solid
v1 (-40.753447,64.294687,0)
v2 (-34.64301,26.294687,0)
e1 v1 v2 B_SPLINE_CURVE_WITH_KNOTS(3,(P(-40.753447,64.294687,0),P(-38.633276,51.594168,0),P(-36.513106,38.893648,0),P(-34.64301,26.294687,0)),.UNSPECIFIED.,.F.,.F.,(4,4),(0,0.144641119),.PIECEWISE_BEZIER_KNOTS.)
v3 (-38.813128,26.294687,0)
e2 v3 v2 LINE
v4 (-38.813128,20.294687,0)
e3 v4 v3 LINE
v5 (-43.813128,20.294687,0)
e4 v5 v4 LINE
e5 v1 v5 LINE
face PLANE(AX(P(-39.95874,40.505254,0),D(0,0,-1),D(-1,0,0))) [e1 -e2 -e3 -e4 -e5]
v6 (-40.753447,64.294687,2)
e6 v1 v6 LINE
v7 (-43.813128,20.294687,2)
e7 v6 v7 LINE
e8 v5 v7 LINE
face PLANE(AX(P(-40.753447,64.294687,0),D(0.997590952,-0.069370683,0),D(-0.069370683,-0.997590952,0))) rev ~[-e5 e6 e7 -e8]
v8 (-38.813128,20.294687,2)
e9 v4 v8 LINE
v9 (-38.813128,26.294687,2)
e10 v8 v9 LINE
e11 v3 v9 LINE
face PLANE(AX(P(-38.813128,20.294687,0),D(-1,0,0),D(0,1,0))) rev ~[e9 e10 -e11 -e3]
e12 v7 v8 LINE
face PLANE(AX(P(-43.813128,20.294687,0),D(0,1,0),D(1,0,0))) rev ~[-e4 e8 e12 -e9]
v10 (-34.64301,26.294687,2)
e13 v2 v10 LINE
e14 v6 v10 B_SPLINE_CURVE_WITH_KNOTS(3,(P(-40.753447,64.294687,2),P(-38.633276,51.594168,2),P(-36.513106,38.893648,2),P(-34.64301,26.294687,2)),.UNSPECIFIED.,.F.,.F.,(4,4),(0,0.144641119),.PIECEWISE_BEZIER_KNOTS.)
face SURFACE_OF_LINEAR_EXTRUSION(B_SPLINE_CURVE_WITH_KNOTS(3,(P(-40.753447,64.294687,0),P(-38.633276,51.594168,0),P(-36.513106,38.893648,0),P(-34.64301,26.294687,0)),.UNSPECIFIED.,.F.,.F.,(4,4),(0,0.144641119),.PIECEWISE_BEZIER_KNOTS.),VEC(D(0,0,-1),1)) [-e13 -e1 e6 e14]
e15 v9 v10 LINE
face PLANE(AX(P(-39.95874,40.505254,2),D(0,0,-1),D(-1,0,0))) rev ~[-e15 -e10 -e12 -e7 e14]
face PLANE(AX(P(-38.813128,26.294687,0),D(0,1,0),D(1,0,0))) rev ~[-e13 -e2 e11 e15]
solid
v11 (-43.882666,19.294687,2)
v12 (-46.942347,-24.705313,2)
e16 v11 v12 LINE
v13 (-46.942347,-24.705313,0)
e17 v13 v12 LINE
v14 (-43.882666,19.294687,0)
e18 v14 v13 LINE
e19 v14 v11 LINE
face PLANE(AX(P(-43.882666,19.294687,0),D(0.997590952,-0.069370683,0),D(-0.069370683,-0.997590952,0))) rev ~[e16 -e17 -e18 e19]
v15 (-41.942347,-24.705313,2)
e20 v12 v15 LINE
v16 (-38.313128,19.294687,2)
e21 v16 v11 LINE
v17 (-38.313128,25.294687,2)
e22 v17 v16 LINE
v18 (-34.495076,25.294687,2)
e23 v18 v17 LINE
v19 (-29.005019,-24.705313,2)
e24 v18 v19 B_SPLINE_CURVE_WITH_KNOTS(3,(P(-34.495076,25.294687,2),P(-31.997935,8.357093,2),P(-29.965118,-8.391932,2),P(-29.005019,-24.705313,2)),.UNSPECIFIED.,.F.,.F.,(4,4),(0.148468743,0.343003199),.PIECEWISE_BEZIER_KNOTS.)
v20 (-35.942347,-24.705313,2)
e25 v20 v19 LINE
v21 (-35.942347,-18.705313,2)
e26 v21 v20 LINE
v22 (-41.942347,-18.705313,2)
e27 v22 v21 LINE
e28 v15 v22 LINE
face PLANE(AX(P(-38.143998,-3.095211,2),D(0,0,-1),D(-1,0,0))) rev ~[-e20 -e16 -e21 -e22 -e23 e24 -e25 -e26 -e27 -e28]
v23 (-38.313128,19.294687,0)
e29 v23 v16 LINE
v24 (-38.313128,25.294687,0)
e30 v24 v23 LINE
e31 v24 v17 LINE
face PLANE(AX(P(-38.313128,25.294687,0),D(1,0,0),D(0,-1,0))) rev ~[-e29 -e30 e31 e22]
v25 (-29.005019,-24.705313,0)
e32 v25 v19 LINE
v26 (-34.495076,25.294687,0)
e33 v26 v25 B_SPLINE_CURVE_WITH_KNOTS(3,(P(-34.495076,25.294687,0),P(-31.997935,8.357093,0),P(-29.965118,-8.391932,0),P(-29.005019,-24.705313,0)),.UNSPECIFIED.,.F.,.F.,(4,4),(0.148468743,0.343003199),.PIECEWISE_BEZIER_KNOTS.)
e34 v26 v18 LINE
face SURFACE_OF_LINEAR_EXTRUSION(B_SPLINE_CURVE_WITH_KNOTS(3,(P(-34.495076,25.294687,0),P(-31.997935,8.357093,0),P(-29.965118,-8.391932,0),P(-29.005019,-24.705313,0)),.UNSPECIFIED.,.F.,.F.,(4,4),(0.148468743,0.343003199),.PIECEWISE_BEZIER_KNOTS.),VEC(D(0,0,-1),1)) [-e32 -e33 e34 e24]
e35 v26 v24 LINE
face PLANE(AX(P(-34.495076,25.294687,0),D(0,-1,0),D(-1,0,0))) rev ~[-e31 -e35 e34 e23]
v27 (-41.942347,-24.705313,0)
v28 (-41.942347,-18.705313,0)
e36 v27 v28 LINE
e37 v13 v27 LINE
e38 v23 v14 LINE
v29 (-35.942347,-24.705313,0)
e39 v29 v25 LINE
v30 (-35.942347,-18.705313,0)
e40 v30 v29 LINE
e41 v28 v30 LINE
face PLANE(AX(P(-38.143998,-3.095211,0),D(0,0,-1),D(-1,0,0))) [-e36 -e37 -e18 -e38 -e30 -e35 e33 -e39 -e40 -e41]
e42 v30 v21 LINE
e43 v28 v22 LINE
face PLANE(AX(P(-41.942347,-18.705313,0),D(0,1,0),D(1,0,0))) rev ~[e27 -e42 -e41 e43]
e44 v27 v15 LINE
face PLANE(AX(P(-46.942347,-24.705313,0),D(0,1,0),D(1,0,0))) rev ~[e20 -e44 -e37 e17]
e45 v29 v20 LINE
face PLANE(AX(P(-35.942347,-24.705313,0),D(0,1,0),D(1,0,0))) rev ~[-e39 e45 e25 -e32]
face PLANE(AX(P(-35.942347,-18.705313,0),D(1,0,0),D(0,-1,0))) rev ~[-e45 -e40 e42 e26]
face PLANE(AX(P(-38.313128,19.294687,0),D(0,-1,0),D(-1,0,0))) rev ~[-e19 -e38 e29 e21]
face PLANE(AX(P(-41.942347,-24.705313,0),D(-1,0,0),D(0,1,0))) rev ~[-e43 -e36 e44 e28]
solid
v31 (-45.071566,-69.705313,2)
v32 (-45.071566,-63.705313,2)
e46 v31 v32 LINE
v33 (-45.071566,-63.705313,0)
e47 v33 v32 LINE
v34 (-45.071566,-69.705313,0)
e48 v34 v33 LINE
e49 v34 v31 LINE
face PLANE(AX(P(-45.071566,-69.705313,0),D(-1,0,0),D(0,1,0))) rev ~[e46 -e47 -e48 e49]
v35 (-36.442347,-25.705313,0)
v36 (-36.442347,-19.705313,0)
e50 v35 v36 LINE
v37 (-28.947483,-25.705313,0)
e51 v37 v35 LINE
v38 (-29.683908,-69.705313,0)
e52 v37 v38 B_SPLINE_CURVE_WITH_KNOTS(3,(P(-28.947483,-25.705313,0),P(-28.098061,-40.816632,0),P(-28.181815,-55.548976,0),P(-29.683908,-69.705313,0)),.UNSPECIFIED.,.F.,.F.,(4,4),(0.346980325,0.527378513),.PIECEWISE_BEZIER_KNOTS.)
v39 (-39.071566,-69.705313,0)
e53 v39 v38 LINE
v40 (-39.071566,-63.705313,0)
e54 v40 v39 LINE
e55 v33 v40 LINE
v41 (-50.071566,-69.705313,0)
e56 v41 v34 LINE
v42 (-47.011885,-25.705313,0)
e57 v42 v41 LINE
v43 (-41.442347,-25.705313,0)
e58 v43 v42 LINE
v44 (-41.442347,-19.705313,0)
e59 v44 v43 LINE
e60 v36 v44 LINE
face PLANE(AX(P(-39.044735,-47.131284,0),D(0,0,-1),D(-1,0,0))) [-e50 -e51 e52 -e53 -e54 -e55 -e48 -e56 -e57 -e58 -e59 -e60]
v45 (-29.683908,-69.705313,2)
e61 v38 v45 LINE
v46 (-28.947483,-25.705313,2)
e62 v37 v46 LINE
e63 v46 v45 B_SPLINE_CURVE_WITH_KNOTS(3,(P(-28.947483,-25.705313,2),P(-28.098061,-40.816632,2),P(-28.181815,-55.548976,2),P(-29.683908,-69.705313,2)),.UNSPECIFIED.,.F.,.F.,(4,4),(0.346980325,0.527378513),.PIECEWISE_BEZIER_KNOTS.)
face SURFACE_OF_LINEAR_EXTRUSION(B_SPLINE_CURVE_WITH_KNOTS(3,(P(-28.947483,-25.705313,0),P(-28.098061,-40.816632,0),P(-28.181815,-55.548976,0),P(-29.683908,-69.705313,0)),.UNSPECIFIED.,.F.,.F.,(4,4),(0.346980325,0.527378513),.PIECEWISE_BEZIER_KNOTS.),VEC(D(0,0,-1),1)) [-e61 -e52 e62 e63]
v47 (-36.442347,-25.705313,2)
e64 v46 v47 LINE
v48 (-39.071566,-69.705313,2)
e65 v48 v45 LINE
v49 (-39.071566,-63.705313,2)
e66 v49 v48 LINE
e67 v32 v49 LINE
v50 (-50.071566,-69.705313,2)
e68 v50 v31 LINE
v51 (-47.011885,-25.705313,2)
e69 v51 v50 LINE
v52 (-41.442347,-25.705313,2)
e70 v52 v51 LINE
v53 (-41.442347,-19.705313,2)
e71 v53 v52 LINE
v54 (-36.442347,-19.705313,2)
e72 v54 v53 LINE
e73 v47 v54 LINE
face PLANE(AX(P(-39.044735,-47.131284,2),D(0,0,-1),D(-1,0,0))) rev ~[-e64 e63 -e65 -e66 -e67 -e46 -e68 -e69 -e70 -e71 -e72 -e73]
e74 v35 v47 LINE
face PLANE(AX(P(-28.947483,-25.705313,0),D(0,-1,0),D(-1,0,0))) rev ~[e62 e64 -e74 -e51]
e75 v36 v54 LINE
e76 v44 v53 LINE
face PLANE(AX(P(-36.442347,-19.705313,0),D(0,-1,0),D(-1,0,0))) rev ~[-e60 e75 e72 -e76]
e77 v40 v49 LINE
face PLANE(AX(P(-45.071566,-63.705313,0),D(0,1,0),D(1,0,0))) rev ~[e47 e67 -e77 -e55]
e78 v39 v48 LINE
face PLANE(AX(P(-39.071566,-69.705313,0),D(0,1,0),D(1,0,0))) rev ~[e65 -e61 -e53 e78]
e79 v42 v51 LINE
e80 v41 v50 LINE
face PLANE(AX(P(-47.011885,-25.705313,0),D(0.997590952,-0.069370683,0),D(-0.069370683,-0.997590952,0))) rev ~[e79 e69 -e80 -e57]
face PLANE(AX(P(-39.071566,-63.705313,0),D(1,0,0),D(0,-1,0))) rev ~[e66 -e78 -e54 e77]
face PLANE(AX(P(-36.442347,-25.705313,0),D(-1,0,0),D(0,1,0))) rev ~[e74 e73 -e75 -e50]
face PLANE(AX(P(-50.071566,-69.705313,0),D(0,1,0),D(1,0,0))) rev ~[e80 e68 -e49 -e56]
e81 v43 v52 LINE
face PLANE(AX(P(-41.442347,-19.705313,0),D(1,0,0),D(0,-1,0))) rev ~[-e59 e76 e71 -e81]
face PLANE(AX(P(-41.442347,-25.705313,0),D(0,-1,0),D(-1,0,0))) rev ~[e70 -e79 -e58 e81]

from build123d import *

# Parameters (mm, degrees)
F1_DEPTH = 2


with BuildPart() as f1:
    # F0 (on Top) → F1 (new body)
    with BuildSketch(Plane.XY):
        with BuildLine():
            add(Edge.make_bspline(
                [(-34.4950757243, 25.2946874197), (-31.9979345744, 8.3570934049), (-29.9651182209, -8.3919319955), (-29.0050185061, -24.7053125803)],
                knots=[0.1484687426, 0.1484687426, 0.1484687426, 0.1484687426, 0.343003199, 0.343003199, 0.343003199, 0.343003199], degree=3))
            Line((-34.4950757243, 25.2946874197), (-38.3131276168, 25.2946874197))
            Line((-38.3131276168, 25.2946874197), (-38.3131276168, 19.2946874197))
            Line((-38.3131276168, 19.2946874197), (-43.8826658205, 19.2946874197))
            Line((-43.8826658205, 19.2946874197), (-46.9423467859, -24.7053125803))
            Line((-46.9423467859, -24.7053125803), (-41.9423467859, -24.7053125803))
            Line((-41.9423467859, -24.7053125803), (-41.9423467859, -18.7053125803))
            Line((-41.9423467859, -18.7053125803), (-35.9423467859, -18.7053125803))
            Line((-35.9423467859, -18.7053125803), (-35.9423467859, -24.7053125803))
            Line((-35.9423467859, -24.7053125803), (-29.0050185061, -24.7053125803))
        make_face()
    extrude(amount=F1_DEPTH)


with BuildPart() as f1b:
    # F0 (on Top) → F1, piece 2 (new body)
    with BuildSketch(Plane.XY):
        with BuildLine():
            add(Edge.make_bspline(
                [(-40.7534466514, 64.2946874197), (-38.6332764023, 51.5941678927), (-36.5131061532, 38.8936483656), (-34.6430102214, 26.2946874197)],
                knots=[0, 0, 0, 0, 0.1446411187, 0.1446411187, 0.1446411187, 0.1446411187], degree=3))
            Line((-40.7534466514, 64.2946874197), (-43.8131276168, 20.2946874197))
            Line((-43.8131276168, 20.2946874197), (-38.8131276168, 20.2946874197))
            Line((-38.8131276168, 20.2946874197), (-38.8131276168, 26.2946874197))
            Line((-38.8131276168, 26.2946874197), (-34.6430102214, 26.2946874197))
        make_face()
    extrude(amount=F1_DEPTH)


with BuildPart() as f1c:
    # F0 (on Top) → F1, piece 3 (new body)
    with BuildSketch(Plane.XY):
        with BuildLine():
            add(Edge.make_bspline(
                [(-28.9474830129, -25.7053125803), (-28.0980614593, -40.8166316864), (-28.1818146304, -55.548975846), (-29.6839084476, -69.7053125803)],
                knots=[0.3469803254, 0.3469803254, 0.3469803254, 0.3469803254, 0.5273785134, 0.5273785134, 0.5273785134, 0.5273785134], degree=3))
            Line((-28.9474830129, -25.7053125803), (-36.4423467859, -25.7053125803))
            Line((-36.4423467859, -25.7053125803), (-36.4423467859, -19.7053125803))
            Line((-36.4423467859, -19.7053125803), (-41.4423467859, -19.7053125803))
            Line((-41.4423467859, -19.7053125803), (-41.4423467859, -25.7053125803))
            Line((-41.4423467859, -25.7053125803), (-47.0118849897, -25.7053125803))
            Line((-47.0118849897, -25.7053125803), (-50.0715659551, -69.7053125803))
            Line((-50.0715659551, -69.7053125803), (-45.0715659551, -69.7053125803))
            Line((-45.0715659551, -69.7053125803), (-45.0715659551, -63.7053125803))
            Line((-45.0715659551, -63.7053125803), (-39.0715659551, -63.7053125803))
            Line((-39.0715659551, -63.7053125803), (-39.0715659551, -69.7053125803))
            Line((-39.0715659551, -69.7053125803), (-29.6839084476, -69.7053125803))
        make_face()
    extrude(amount=F1_DEPTH)


solid = Compound([f1.part, f1b.part, f1c.part])
